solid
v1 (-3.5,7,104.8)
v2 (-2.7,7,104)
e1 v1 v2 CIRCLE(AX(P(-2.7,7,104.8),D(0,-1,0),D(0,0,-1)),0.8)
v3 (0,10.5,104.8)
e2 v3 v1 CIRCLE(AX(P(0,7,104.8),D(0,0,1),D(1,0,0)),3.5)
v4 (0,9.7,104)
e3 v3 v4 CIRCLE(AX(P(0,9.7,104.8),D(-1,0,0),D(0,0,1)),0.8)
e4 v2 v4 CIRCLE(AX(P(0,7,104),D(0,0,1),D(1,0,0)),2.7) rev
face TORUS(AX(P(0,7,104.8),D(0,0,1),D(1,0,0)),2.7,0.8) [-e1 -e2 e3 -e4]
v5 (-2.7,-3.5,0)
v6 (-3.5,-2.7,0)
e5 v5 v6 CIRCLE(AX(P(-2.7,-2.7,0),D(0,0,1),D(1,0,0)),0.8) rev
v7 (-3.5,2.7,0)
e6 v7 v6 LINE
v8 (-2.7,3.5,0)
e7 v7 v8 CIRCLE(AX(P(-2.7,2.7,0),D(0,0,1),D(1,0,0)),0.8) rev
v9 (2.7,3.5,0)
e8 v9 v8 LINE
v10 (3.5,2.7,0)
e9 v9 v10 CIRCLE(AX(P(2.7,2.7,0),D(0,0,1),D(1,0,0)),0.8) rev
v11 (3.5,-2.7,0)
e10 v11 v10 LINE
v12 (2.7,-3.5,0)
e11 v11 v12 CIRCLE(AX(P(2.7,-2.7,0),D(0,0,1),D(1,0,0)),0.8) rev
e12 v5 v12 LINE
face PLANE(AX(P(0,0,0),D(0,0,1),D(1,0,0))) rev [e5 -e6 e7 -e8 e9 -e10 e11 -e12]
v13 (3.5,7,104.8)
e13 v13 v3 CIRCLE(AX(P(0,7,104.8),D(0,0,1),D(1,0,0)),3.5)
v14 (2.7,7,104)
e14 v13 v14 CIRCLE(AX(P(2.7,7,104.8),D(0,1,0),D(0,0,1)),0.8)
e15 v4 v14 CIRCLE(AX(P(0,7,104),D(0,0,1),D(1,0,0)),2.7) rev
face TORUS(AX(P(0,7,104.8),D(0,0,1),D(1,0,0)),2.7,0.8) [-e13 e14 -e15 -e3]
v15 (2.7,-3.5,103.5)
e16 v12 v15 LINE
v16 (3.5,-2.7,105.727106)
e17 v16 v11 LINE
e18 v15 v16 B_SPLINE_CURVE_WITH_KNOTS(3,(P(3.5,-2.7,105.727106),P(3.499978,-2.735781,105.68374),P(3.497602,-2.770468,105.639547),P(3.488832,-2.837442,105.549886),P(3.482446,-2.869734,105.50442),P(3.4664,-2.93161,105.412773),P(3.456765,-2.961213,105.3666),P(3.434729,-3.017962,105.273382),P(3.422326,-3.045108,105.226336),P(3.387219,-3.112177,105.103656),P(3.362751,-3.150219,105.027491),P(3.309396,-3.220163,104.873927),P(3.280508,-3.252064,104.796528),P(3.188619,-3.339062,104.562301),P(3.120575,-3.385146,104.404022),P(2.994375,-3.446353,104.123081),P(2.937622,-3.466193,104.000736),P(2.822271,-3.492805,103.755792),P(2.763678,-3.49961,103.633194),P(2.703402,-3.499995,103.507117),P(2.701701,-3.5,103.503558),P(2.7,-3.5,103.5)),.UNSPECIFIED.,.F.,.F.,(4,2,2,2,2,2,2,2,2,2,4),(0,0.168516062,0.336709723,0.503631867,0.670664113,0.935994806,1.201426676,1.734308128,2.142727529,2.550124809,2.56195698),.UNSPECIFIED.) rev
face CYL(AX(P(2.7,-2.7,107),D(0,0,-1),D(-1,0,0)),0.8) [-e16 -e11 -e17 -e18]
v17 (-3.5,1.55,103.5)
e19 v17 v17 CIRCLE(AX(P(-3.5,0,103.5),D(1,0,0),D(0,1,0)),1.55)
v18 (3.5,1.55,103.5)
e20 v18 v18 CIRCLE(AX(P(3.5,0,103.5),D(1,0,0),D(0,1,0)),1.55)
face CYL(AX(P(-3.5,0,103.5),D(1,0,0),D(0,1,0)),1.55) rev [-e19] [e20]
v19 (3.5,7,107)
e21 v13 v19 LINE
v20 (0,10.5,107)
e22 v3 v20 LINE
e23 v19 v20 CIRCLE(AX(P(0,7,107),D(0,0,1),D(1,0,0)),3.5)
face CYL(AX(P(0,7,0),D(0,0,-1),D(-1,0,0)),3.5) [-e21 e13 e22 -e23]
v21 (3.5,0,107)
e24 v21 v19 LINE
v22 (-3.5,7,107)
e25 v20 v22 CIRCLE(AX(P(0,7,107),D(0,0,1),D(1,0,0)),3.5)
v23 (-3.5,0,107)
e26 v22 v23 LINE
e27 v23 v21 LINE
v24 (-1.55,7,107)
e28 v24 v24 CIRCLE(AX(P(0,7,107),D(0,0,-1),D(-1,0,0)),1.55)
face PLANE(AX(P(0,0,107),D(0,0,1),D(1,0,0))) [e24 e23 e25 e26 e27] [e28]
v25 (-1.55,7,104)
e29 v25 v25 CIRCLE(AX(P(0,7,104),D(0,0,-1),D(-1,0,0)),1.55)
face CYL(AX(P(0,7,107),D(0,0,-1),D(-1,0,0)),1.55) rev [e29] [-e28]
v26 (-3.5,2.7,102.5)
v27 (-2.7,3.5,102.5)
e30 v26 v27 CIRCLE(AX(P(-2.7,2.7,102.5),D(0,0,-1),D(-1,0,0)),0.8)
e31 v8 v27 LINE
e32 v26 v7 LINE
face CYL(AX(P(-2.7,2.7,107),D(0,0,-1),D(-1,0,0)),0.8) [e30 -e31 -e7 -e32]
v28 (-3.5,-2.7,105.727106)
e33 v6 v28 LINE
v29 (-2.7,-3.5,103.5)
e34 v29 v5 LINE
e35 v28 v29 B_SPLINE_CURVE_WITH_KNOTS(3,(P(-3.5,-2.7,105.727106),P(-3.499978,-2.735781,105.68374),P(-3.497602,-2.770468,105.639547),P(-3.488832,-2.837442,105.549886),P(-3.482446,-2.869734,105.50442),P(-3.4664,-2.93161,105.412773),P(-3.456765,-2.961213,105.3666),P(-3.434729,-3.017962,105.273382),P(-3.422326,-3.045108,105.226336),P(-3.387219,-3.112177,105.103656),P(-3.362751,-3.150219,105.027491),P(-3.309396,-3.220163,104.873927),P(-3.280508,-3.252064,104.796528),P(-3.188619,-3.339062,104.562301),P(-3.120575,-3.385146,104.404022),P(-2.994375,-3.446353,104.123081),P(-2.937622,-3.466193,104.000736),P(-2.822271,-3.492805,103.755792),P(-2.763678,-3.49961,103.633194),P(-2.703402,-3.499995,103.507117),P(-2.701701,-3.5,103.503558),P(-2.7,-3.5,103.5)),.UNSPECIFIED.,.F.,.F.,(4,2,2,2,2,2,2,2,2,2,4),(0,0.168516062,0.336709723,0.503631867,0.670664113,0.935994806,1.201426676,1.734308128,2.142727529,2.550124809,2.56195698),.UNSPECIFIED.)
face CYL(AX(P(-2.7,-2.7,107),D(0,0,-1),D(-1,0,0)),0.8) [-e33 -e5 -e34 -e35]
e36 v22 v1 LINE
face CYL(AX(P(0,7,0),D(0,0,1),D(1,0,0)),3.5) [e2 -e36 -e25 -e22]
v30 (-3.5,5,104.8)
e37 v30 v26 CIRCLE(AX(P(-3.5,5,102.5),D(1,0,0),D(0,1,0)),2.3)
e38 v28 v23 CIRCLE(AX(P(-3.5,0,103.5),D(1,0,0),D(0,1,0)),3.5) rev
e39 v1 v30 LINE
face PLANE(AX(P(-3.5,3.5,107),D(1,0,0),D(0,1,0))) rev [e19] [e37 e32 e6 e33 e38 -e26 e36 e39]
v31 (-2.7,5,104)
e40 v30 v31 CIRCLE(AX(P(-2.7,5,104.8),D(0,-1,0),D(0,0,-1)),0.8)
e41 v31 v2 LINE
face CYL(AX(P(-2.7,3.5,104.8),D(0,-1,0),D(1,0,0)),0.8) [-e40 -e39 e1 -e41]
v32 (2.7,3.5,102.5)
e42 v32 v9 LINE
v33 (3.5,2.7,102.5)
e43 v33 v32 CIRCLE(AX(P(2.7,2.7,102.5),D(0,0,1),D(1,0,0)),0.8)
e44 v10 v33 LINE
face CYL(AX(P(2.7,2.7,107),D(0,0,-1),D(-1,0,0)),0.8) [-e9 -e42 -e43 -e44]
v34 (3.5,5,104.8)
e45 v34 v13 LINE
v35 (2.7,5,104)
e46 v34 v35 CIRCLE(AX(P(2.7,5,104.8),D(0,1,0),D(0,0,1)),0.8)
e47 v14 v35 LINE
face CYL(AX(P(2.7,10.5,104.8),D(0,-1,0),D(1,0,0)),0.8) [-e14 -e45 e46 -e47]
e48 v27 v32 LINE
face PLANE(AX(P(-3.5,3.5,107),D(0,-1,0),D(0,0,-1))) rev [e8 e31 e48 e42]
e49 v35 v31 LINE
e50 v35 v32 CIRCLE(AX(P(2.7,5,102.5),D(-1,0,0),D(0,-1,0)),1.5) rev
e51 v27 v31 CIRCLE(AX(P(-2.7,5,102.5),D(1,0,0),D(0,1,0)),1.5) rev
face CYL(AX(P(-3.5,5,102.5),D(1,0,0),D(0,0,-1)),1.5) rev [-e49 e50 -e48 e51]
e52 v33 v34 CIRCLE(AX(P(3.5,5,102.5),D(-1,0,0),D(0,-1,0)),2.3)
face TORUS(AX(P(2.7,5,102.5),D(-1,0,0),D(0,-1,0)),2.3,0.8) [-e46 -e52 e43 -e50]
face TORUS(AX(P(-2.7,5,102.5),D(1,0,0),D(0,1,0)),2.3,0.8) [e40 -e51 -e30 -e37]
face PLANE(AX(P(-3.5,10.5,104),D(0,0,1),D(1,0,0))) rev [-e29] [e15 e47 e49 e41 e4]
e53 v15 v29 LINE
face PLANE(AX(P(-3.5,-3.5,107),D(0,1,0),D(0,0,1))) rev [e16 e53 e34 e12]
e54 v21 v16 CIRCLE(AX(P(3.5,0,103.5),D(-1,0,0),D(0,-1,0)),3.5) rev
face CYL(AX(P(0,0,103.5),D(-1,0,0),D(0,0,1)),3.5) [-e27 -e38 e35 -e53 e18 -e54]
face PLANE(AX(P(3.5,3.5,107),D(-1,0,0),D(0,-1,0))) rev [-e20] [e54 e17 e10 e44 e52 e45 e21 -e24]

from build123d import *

# Parameters (mm, degrees)
SKETCH_1_W          = 7
SKETCH_1_H          = 7
EXTRUDE_1_DEPTH     = 107
FILLET_1_R          = 3.5
SKETCH_5_R          = 1.55
CUT_EXTRUDE_2_DEPTH = 108.285833175
SKETCH_6_W          = 7
SKETCH_6_H          = 3
EXTRUDE_2_DEPTH     = 7
FILLET_2_R          = 3.5
SKETCH_7_R          = 1.55
CUT_EXTRUDE_4_DEPTH = 105.587284122
FILLET_3_R          = 1.5
FILLET_4_R          = 0.8
FILLET_5_R          = 0.8


# Some blends are built 0.0001 mm under size
with BuildPart() as part:
    # 草图1 → 凸台-拉伸1 (new body)
    with BuildSketch(Plane.XY):
        Rectangle(SKETCH_1_W, SKETCH_1_H)
    extrude(amount=EXTRUDE_1_DEPTH)

    # 圆角1
    fillet_1_edges = [part.edges().sort_by_distance(p)[0] for p in [
        (0, -3.5, 107),
    ]]
    fillet(fillet_1_edges, radius=FILLET_1_R)

    # 草图5 → 切除-拉伸2 (cut, through all)
    with BuildSketch(Plane(origin=(3.5, 0, 0), x_dir=(0, 0, -1), z_dir=(1, 0, 0))):
        with Locations(Location((-103.5, 0, 0), (0, 0, 90))):
            Circle(SKETCH_5_R)
    extrude(amount=-CUT_EXTRUDE_2_DEPTH, mode=Mode.SUBTRACT)

    # 草图6 → 凸台-拉伸2 (add)
    with BuildSketch(Plane(origin=(0, 3.5, 0), x_dir=(1, 0, 0), z_dir=(0, 1, 0))):
        with Locations((0, -105.5)):
            Rectangle(SKETCH_6_W, SKETCH_6_H)
    extrude(amount=EXTRUDE_2_DEPTH)

    # 圆角2
    fillet_2_edges = [part.edges().sort_by_distance(p)[0] for p in [
        (3.5, 10.5, 105.5),
        (-3.5, 10.5, 105.5),
    ]]
    fillet(fillet_2_edges, radius=FILLET_2_R - 0.0001)  # a hair under: the kernel refuses the full size

    # 草图7 → 切除-拉伸4 (cut, through all)
    with BuildSketch(Plane(origin=(0, 0, 104), x_dir=(-1, 0, 0), z_dir=(0, 0, -1))):
        with Locations((0, 7)):
            Circle(SKETCH_7_R)
    extrude(amount=-CUT_EXTRUDE_4_DEPTH, mode=Mode.SUBTRACT)

    # 圆角3
    fillet_3_edges = [part.edges().sort_by_distance(p)[0] for p in [
        (0, 3.5, 104),
    ]]
    fillet(fillet_3_edges, radius=FILLET_3_R)

    # 圆角4
    fillet_4_edges = [part.edges().sort_by_distance(p)[0] for p in [
        (-3.5, 6.00005, 104),
        (3.5, 6.00005, 104),
        (-2.474903023, 9.474903023, 104),
        (2.474903023, 9.474903023, 104),
        (3.5, 3.5, 51.25),
        (-3.5, 3.5, 51.25),
        (-3.5, 3.939339828, 103.560660172),
        (3.5, 3.939339828, 103.560660172),
    ]]
    fillet(fillet_4_edges, radius=FILLET_4_R)

    # 圆角5
    # the kernel refuses this fillet: 0.8 mm, written as the material it takes off along each edge
    with BuildSketch(Plane(origin=(3.5, -3.5, -4.8), x_dir=(0, 1, 0), z_dir=(0, 0, 1)), Plane(origin=(-3.5, -3.5, -4.8), x_dir=(1, 0, 0), z_dir=(0, 0, 1))) as fillet_5_piece_1:
        with BuildLine():
            CenterArc((FILLET_5_R, FILLET_5_R), FILLET_5_R, 180, 90)
            Line((0, FILLET_5_R), (-FILLET_5_R * 0.02, FILLET_5_R))
            Line((-FILLET_5_R * 0.02, FILLET_5_R), (-FILLET_5_R * 0.02, -FILLET_5_R * 0.02))
            Line((-FILLET_5_R * 0.02, -FILLET_5_R * 0.02), (FILLET_5_R, -FILLET_5_R * 0.02))
            Line((FILLET_5_R, -FILLET_5_R * 0.02), (FILLET_5_R, 0))
        make_face()
    extrude(amount=113.1, mode=Mode.SUBTRACT)


solid = part.part
